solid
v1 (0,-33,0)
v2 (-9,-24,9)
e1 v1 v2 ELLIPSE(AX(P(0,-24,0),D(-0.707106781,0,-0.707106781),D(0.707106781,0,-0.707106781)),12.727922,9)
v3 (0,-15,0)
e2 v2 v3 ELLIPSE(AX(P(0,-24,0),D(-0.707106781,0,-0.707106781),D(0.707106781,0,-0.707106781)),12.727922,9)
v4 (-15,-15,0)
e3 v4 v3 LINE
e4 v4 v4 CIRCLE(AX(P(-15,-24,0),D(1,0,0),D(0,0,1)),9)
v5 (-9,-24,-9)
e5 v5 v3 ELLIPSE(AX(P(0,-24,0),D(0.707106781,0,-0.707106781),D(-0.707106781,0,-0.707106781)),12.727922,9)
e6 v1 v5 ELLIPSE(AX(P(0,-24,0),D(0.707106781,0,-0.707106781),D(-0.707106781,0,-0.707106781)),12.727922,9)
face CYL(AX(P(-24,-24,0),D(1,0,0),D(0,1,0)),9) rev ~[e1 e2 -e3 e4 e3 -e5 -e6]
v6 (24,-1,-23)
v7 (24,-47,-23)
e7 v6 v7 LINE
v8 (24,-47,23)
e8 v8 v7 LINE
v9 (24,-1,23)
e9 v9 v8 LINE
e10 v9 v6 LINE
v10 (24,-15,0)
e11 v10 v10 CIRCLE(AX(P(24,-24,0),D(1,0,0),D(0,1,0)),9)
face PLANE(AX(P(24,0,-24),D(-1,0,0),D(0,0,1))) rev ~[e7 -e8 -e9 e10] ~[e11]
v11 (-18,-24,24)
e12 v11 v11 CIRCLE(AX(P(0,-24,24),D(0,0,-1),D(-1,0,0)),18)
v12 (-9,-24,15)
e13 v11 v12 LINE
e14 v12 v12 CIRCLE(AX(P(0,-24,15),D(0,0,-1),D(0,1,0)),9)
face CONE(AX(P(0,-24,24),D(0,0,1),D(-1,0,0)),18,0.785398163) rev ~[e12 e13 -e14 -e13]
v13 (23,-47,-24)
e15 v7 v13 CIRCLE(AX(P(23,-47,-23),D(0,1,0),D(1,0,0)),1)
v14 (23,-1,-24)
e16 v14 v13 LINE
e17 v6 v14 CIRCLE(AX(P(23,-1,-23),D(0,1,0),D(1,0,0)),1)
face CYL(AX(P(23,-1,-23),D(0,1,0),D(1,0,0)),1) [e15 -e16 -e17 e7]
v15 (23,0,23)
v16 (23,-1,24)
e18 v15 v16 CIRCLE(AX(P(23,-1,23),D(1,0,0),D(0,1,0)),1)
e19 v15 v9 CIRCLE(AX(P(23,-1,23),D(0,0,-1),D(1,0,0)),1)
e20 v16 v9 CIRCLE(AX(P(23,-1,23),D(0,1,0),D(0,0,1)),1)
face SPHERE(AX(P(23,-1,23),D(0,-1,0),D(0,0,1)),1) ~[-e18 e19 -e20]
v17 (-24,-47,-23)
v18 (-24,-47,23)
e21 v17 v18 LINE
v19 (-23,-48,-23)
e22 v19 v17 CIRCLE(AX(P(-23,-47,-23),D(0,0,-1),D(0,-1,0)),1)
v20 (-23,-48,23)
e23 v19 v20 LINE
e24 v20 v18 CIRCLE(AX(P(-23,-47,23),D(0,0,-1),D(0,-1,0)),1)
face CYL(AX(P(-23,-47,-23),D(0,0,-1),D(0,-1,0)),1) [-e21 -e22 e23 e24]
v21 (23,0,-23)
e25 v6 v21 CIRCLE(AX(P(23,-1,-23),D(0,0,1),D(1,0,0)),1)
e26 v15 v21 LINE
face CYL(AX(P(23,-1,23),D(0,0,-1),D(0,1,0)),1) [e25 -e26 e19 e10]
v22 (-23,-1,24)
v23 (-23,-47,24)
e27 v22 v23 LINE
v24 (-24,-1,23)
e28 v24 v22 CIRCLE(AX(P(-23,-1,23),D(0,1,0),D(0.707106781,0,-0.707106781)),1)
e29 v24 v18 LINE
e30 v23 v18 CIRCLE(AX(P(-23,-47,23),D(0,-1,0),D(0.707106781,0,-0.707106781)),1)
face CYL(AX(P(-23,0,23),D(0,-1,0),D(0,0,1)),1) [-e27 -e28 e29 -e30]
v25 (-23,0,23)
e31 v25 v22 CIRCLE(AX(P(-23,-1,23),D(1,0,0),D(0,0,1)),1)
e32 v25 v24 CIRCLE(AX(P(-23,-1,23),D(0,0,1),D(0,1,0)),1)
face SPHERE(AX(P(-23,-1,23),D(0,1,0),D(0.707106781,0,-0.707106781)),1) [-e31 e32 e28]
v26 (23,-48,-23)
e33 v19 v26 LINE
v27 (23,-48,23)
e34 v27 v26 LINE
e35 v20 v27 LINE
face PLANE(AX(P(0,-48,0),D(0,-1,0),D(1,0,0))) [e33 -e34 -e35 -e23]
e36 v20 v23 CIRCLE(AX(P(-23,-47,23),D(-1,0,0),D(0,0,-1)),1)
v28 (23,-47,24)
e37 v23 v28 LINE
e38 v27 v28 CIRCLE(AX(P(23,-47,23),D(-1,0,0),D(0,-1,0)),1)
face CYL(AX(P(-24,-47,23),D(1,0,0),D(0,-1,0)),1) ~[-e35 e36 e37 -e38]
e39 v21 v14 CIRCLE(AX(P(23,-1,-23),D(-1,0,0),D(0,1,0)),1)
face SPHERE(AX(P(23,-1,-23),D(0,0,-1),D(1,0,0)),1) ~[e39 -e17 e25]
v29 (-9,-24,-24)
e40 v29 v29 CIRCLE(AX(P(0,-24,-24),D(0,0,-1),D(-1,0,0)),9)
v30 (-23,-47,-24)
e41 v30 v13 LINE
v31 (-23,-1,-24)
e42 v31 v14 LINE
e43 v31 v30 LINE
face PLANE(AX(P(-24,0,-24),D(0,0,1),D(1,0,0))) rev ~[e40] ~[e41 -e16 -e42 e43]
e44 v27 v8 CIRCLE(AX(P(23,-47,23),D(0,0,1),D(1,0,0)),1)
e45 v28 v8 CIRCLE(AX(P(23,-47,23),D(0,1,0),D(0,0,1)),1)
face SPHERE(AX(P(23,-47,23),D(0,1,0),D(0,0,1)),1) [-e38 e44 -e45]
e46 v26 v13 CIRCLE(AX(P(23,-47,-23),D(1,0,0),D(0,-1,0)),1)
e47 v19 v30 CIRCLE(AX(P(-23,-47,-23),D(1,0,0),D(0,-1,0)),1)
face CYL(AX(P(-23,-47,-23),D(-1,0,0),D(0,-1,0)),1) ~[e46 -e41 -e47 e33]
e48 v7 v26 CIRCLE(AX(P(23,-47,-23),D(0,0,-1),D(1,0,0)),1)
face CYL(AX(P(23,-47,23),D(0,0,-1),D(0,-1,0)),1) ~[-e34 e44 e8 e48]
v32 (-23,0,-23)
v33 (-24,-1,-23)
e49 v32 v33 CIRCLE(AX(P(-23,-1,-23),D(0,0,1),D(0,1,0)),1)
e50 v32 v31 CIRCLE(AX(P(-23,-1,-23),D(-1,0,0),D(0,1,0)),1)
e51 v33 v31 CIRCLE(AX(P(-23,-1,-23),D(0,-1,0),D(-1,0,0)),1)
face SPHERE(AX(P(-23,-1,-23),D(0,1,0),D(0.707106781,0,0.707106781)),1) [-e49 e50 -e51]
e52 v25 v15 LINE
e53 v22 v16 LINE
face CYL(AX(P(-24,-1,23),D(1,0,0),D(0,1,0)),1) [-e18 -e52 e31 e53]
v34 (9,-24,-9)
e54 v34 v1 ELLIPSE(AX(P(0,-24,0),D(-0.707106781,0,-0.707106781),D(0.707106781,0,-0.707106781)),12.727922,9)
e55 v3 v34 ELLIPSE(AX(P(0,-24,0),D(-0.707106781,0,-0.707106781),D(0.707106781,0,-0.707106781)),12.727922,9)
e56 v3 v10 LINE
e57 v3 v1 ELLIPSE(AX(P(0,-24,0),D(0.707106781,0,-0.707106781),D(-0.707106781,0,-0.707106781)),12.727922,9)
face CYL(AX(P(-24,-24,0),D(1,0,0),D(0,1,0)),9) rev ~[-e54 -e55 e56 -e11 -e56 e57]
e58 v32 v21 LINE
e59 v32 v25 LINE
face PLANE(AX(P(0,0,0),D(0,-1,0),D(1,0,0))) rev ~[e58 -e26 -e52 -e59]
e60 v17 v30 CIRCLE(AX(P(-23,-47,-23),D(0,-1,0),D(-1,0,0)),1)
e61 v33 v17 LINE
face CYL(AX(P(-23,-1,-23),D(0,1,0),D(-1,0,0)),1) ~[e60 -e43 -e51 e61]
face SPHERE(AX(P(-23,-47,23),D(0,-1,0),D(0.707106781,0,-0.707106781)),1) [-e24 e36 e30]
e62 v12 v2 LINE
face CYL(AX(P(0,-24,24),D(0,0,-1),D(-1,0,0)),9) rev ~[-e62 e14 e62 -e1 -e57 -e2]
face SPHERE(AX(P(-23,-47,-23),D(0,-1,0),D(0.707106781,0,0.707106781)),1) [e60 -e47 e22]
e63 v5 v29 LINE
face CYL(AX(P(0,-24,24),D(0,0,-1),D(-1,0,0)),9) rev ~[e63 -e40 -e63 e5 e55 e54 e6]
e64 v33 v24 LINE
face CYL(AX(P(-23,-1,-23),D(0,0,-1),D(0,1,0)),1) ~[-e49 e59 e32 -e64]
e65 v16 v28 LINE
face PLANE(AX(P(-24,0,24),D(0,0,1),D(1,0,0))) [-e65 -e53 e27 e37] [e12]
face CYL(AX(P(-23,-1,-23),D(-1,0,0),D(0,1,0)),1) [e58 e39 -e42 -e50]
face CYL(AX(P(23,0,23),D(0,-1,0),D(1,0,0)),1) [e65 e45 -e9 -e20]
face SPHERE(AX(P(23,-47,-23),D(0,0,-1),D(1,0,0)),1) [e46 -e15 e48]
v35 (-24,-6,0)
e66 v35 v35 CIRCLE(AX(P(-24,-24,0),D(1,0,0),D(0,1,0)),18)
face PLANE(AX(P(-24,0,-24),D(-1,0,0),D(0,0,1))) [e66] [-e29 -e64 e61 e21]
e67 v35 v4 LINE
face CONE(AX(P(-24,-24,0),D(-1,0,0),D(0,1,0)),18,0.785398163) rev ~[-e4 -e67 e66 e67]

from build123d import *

# Parameters (mm, degrees)
F0_W           = 48
F0_H           = 48
F1_DEPTH       = 48
F2_R           = 1
F3_R           = 1
F4_T1_DEPTH    = 46
F4_T3_DEPTH    = 46
F4_T5_DEPTH    = 46
F4_S9_W        = 1
F4_S9_H        = 1
F4_T10_DEPTH   = 1
F4_S15_W       = 1
F4_S15_H       = 1
F4_T16_DEPTH   = 1
F4_S21_W       = 1
F4_S21_H       = 1
F4_T22_DEPTH   = 1
F4_S27_W       = 1
F4_S27_H       = 1
F4_T28_DEPTH   = 1
F4_T32_ANGLE   = 90
F4_T34_ANGLE   = 90
F6_D           = 18
F6_CSINK_D     = 36
F6_CSINK_ANGLE = 90
F8_D           = 18
F8_CSINK_D     = 36
F8_CSINK_ANGLE = 90


# Not quite as in the source:
# - a fillet or chamfer that OpenCascade refuses, or shapes differently, is made with other operations: its cross-section is extruded or revolved along the edge and cut away or added


with BuildPart() as f1:
    # F0 (on Front) → F1 (new body)
    with BuildSketch(Plane.XZ):
        Rectangle(F0_W, F0_H)
    extrude(amount=F1_DEPTH)

    # F2
    f2_edges = [f1.edges().sort_by_distance(p)[0] for p in [
        (24, -24, 24),
    ]]
    fillet(f2_edges, radius=F2_R)

    # F3
    f3_edges = [f1.edges().sort_by_distance(p)[0] for p in [
        (-24, -24, 24),
        (-0.5, 0, 24),
        (-0.5, -48, 24),
    ]]
    fillet(f3_edges, radius=F3_R)

    # F4: fillet of radius 1 on 8 edges, made by hand

    # F4_s2 → F4_t1 (cut)
    with BuildSketch(Plane.XY.offset(-23)):
        with BuildLine():
            ThreePointArc((-23, -48), (-23.7071067812, -47.7071067812), (-24, -47))
            Line((-24, -47), (-24, -48))
            Line((-24, -48), (-23, -48))
        make_face()
        with BuildLine():
            ThreePointArc((-23, 0), (-23.7071067812, -0.2928932188), (-24, -1))
            Line((-24, -1), (-24, 0))
            Line((-24, 0), (-23, 0))
        make_face()
    extrude(amount=F4_T1_DEPTH, mode=Mode.SUBTRACT)

    # F4_s4 → F4_t3 (cut)
    with BuildSketch(Plane.YZ.offset(-23)):
        with BuildLine():
            ThreePointArc((0, -23), (-0.2928932188, -23.7071067812), (-1, -24))
            Line((-1, -24), (0, -24))
            Line((0, -24), (0, -23))
        make_face()
        with BuildLine():
            ThreePointArc((-48, -23), (-47.7071067812, -23.7071067812), (-47, -24))
            Line((-47, -24), (-48, -24))
            Line((-48, -24), (-48, -23))
        make_face()
    extrude(amount=F4_T3_DEPTH, mode=Mode.SUBTRACT)

    # F4_s6 → F4_t5 (cut)
    with BuildSketch(Plane.XZ.offset(1)):
        with BuildLine():
            ThreePointArc((-24, -23), (-23.7071067812, -23.7071067812), (-23, -24))
            Line((-23, -24), (-24, -24))
            Line((-24, -24), (-24, -23))
        make_face()
        with BuildLine():
            ThreePointArc((24, -23), (23.7071067812, -23.7071067812), (23, -24))
            Line((23, -24), (24, -24))
            Line((24, -24), (24, -23))
        make_face()
    extrude(amount=F4_T5_DEPTH, mode=Mode.SUBTRACT)


with BuildPart() as f4_tool8:
    # F4_s9 → F4_t10 (new body)
    with BuildSketch(Plane.XZ.offset(1)):
        with Locations((-23.5, 23.5)):
            Rectangle(F4_S9_W, F4_S9_H)
    extrude(amount=-F4_T10_DEPTH)

    # F4_s11 → F4_t12 (revolve, cut)
    with BuildSketch(Plane(origin=(-23, -1, 23), x_dir=(0.7071067812, 0, -0.7071067812), z_dir=(0.7071067812, 0, 0.7071067812))):
        with BuildLine():
            ThreePointArc((0, -1), (1, 0), (0, 1))
            Line((0, 1), (0, -1))
        make_face()
    revolve(axis=Axis((-23, -1, 23), (0, 1, 0)), mode=Mode.SUBTRACT)


with BuildPart() as f1_1:
    add(f1.part)

    # F4_t7: cut F4_tool8
    add(f4_tool8.part, mode=Mode.SUBTRACT)


with BuildPart() as f4_tool14:
    # F4_s15 → F4_t16 (new body)
    with BuildSketch(Plane.XZ.offset(47)):
        with Locations((-23.5, 23.5)):
            Rectangle(F4_S15_W, F4_S15_H)
    extrude(amount=F4_T16_DEPTH)

    # F4_s17 → F4_t18 (revolve, cut)
    with BuildSketch(Plane(origin=(-23, -47, 23), x_dir=(0.7071067812, 0, -0.7071067812), z_dir=(-0.7071067812, 0, -0.7071067812))):
        with BuildLine():
            ThreePointArc((0, -1), (1, 0), (0, 1))
            Line((0, 1), (0, -1))
        make_face()
    revolve(axis=Axis((-23, -47, 23), (0, -1, 0)), mode=Mode.SUBTRACT)


with BuildPart() as f1_2:
    add(f1_1.part)

    # F4_t13: cut F4_tool14
    add(f4_tool14.part, mode=Mode.SUBTRACT)


with BuildPart() as f4_tool20:
    # F4_s21 → F4_t22 (new body)
    with BuildSketch(Plane.XZ.offset(47)):
        with Locations((-23.5, -23.5)):
            Rectangle(F4_S21_W, F4_S21_H)
    extrude(amount=F4_T22_DEPTH)

    # F4_s23 → F4_t24 (revolve, cut)
    with BuildSketch(Plane(origin=(-23, -47, -23), x_dir=(0.7071067812, 0, 0.7071067812), z_dir=(0.7071067812, 0, -0.7071067812))):
        with BuildLine():
            ThreePointArc((0, -1), (1, 0), (0, 1))
            Line((0, 1), (0, -1))
        make_face()
    revolve(axis=Axis((-23, -47, -23), (0, -1, 0)), mode=Mode.SUBTRACT)


with BuildPart() as f1_3:
    add(f1_2.part)

    # F4_t19: cut F4_tool20
    add(f4_tool20.part, mode=Mode.SUBTRACT)


with BuildPart() as f4_tool26:
    # F4_s27 → F4_t28 (new body)
    with BuildSketch(Plane.XZ.offset(1)):
        with Locations((-23.5, -23.5)):
            Rectangle(F4_S27_W, F4_S27_H)
    extrude(amount=-F4_T28_DEPTH)

    # F4_s29 → F4_t30 (revolve, cut)
    with BuildSketch(Plane(origin=(-23, -1, -23), x_dir=(0.7071067812, 0, 0.7071067812), z_dir=(-0.7071067812, 0, 0.7071067812))):
        with BuildLine():
            ThreePointArc((0, -1), (1, 0), (0, 1))
            Line((0, 1), (0, -1))
        make_face()
    revolve(axis=Axis((-23, -1, -23), (0, 1, 0)), mode=Mode.SUBTRACT)


with BuildPart() as f1_4:
    add(f1_3.part)

    # F4_t25: cut F4_tool26
    add(f4_tool26.part, mode=Mode.SUBTRACT)

    # F4_s31 → F4_t32 (revolve, cut)
    with BuildSketch(Plane.XZ.offset(1)):
        with BuildLine():
            ThreePointArc((24, -23), (23.7071067812, -23.7071067812), (23, -24))
            Line((23, -24), (24, -24))
            Line((24, -24), (24, -23))
        make_face()
    revolve(axis=Axis((23, -1, -24), (0, 0, 1)), revolution_arc=F4_T32_ANGLE, mode=Mode.SUBTRACT)

    # F4_s33 → F4_t34 (revolve, cut)
    with BuildSketch(Plane.XZ.offset(47)):
        with BuildLine():
            ThreePointArc((24, -23), (23.7071067812, -23.7071067812), (23, -24))
            Line((23, -24), (24, -24))
            Line((24, -24), (24, -23))
        make_face()
    revolve(axis=Axis((23, -47, -24), (0, 0, -1)), revolution_arc=F4_T34_ANGLE, mode=Mode.SUBTRACT)

    # F6 (through all)
    with Locations(Plane.XY.offset(24)):
        with Locations((0, -24)):
            CounterSinkHole(F6_D / 2, F6_CSINK_D / 2, counter_sink_angle=F6_CSINK_ANGLE)

    # F8 (through all)
    with Locations(Plane(origin=(-24, 0, 0), x_dir=(0, -1, 0), z_dir=(-1, 0, 0))):
        with Locations((24, 0)):
            CounterSinkHole(F8_D / 2, F8_CSINK_D / 2, counter_sink_angle=F8_CSINK_ANGLE)


solid = f1_4.part
